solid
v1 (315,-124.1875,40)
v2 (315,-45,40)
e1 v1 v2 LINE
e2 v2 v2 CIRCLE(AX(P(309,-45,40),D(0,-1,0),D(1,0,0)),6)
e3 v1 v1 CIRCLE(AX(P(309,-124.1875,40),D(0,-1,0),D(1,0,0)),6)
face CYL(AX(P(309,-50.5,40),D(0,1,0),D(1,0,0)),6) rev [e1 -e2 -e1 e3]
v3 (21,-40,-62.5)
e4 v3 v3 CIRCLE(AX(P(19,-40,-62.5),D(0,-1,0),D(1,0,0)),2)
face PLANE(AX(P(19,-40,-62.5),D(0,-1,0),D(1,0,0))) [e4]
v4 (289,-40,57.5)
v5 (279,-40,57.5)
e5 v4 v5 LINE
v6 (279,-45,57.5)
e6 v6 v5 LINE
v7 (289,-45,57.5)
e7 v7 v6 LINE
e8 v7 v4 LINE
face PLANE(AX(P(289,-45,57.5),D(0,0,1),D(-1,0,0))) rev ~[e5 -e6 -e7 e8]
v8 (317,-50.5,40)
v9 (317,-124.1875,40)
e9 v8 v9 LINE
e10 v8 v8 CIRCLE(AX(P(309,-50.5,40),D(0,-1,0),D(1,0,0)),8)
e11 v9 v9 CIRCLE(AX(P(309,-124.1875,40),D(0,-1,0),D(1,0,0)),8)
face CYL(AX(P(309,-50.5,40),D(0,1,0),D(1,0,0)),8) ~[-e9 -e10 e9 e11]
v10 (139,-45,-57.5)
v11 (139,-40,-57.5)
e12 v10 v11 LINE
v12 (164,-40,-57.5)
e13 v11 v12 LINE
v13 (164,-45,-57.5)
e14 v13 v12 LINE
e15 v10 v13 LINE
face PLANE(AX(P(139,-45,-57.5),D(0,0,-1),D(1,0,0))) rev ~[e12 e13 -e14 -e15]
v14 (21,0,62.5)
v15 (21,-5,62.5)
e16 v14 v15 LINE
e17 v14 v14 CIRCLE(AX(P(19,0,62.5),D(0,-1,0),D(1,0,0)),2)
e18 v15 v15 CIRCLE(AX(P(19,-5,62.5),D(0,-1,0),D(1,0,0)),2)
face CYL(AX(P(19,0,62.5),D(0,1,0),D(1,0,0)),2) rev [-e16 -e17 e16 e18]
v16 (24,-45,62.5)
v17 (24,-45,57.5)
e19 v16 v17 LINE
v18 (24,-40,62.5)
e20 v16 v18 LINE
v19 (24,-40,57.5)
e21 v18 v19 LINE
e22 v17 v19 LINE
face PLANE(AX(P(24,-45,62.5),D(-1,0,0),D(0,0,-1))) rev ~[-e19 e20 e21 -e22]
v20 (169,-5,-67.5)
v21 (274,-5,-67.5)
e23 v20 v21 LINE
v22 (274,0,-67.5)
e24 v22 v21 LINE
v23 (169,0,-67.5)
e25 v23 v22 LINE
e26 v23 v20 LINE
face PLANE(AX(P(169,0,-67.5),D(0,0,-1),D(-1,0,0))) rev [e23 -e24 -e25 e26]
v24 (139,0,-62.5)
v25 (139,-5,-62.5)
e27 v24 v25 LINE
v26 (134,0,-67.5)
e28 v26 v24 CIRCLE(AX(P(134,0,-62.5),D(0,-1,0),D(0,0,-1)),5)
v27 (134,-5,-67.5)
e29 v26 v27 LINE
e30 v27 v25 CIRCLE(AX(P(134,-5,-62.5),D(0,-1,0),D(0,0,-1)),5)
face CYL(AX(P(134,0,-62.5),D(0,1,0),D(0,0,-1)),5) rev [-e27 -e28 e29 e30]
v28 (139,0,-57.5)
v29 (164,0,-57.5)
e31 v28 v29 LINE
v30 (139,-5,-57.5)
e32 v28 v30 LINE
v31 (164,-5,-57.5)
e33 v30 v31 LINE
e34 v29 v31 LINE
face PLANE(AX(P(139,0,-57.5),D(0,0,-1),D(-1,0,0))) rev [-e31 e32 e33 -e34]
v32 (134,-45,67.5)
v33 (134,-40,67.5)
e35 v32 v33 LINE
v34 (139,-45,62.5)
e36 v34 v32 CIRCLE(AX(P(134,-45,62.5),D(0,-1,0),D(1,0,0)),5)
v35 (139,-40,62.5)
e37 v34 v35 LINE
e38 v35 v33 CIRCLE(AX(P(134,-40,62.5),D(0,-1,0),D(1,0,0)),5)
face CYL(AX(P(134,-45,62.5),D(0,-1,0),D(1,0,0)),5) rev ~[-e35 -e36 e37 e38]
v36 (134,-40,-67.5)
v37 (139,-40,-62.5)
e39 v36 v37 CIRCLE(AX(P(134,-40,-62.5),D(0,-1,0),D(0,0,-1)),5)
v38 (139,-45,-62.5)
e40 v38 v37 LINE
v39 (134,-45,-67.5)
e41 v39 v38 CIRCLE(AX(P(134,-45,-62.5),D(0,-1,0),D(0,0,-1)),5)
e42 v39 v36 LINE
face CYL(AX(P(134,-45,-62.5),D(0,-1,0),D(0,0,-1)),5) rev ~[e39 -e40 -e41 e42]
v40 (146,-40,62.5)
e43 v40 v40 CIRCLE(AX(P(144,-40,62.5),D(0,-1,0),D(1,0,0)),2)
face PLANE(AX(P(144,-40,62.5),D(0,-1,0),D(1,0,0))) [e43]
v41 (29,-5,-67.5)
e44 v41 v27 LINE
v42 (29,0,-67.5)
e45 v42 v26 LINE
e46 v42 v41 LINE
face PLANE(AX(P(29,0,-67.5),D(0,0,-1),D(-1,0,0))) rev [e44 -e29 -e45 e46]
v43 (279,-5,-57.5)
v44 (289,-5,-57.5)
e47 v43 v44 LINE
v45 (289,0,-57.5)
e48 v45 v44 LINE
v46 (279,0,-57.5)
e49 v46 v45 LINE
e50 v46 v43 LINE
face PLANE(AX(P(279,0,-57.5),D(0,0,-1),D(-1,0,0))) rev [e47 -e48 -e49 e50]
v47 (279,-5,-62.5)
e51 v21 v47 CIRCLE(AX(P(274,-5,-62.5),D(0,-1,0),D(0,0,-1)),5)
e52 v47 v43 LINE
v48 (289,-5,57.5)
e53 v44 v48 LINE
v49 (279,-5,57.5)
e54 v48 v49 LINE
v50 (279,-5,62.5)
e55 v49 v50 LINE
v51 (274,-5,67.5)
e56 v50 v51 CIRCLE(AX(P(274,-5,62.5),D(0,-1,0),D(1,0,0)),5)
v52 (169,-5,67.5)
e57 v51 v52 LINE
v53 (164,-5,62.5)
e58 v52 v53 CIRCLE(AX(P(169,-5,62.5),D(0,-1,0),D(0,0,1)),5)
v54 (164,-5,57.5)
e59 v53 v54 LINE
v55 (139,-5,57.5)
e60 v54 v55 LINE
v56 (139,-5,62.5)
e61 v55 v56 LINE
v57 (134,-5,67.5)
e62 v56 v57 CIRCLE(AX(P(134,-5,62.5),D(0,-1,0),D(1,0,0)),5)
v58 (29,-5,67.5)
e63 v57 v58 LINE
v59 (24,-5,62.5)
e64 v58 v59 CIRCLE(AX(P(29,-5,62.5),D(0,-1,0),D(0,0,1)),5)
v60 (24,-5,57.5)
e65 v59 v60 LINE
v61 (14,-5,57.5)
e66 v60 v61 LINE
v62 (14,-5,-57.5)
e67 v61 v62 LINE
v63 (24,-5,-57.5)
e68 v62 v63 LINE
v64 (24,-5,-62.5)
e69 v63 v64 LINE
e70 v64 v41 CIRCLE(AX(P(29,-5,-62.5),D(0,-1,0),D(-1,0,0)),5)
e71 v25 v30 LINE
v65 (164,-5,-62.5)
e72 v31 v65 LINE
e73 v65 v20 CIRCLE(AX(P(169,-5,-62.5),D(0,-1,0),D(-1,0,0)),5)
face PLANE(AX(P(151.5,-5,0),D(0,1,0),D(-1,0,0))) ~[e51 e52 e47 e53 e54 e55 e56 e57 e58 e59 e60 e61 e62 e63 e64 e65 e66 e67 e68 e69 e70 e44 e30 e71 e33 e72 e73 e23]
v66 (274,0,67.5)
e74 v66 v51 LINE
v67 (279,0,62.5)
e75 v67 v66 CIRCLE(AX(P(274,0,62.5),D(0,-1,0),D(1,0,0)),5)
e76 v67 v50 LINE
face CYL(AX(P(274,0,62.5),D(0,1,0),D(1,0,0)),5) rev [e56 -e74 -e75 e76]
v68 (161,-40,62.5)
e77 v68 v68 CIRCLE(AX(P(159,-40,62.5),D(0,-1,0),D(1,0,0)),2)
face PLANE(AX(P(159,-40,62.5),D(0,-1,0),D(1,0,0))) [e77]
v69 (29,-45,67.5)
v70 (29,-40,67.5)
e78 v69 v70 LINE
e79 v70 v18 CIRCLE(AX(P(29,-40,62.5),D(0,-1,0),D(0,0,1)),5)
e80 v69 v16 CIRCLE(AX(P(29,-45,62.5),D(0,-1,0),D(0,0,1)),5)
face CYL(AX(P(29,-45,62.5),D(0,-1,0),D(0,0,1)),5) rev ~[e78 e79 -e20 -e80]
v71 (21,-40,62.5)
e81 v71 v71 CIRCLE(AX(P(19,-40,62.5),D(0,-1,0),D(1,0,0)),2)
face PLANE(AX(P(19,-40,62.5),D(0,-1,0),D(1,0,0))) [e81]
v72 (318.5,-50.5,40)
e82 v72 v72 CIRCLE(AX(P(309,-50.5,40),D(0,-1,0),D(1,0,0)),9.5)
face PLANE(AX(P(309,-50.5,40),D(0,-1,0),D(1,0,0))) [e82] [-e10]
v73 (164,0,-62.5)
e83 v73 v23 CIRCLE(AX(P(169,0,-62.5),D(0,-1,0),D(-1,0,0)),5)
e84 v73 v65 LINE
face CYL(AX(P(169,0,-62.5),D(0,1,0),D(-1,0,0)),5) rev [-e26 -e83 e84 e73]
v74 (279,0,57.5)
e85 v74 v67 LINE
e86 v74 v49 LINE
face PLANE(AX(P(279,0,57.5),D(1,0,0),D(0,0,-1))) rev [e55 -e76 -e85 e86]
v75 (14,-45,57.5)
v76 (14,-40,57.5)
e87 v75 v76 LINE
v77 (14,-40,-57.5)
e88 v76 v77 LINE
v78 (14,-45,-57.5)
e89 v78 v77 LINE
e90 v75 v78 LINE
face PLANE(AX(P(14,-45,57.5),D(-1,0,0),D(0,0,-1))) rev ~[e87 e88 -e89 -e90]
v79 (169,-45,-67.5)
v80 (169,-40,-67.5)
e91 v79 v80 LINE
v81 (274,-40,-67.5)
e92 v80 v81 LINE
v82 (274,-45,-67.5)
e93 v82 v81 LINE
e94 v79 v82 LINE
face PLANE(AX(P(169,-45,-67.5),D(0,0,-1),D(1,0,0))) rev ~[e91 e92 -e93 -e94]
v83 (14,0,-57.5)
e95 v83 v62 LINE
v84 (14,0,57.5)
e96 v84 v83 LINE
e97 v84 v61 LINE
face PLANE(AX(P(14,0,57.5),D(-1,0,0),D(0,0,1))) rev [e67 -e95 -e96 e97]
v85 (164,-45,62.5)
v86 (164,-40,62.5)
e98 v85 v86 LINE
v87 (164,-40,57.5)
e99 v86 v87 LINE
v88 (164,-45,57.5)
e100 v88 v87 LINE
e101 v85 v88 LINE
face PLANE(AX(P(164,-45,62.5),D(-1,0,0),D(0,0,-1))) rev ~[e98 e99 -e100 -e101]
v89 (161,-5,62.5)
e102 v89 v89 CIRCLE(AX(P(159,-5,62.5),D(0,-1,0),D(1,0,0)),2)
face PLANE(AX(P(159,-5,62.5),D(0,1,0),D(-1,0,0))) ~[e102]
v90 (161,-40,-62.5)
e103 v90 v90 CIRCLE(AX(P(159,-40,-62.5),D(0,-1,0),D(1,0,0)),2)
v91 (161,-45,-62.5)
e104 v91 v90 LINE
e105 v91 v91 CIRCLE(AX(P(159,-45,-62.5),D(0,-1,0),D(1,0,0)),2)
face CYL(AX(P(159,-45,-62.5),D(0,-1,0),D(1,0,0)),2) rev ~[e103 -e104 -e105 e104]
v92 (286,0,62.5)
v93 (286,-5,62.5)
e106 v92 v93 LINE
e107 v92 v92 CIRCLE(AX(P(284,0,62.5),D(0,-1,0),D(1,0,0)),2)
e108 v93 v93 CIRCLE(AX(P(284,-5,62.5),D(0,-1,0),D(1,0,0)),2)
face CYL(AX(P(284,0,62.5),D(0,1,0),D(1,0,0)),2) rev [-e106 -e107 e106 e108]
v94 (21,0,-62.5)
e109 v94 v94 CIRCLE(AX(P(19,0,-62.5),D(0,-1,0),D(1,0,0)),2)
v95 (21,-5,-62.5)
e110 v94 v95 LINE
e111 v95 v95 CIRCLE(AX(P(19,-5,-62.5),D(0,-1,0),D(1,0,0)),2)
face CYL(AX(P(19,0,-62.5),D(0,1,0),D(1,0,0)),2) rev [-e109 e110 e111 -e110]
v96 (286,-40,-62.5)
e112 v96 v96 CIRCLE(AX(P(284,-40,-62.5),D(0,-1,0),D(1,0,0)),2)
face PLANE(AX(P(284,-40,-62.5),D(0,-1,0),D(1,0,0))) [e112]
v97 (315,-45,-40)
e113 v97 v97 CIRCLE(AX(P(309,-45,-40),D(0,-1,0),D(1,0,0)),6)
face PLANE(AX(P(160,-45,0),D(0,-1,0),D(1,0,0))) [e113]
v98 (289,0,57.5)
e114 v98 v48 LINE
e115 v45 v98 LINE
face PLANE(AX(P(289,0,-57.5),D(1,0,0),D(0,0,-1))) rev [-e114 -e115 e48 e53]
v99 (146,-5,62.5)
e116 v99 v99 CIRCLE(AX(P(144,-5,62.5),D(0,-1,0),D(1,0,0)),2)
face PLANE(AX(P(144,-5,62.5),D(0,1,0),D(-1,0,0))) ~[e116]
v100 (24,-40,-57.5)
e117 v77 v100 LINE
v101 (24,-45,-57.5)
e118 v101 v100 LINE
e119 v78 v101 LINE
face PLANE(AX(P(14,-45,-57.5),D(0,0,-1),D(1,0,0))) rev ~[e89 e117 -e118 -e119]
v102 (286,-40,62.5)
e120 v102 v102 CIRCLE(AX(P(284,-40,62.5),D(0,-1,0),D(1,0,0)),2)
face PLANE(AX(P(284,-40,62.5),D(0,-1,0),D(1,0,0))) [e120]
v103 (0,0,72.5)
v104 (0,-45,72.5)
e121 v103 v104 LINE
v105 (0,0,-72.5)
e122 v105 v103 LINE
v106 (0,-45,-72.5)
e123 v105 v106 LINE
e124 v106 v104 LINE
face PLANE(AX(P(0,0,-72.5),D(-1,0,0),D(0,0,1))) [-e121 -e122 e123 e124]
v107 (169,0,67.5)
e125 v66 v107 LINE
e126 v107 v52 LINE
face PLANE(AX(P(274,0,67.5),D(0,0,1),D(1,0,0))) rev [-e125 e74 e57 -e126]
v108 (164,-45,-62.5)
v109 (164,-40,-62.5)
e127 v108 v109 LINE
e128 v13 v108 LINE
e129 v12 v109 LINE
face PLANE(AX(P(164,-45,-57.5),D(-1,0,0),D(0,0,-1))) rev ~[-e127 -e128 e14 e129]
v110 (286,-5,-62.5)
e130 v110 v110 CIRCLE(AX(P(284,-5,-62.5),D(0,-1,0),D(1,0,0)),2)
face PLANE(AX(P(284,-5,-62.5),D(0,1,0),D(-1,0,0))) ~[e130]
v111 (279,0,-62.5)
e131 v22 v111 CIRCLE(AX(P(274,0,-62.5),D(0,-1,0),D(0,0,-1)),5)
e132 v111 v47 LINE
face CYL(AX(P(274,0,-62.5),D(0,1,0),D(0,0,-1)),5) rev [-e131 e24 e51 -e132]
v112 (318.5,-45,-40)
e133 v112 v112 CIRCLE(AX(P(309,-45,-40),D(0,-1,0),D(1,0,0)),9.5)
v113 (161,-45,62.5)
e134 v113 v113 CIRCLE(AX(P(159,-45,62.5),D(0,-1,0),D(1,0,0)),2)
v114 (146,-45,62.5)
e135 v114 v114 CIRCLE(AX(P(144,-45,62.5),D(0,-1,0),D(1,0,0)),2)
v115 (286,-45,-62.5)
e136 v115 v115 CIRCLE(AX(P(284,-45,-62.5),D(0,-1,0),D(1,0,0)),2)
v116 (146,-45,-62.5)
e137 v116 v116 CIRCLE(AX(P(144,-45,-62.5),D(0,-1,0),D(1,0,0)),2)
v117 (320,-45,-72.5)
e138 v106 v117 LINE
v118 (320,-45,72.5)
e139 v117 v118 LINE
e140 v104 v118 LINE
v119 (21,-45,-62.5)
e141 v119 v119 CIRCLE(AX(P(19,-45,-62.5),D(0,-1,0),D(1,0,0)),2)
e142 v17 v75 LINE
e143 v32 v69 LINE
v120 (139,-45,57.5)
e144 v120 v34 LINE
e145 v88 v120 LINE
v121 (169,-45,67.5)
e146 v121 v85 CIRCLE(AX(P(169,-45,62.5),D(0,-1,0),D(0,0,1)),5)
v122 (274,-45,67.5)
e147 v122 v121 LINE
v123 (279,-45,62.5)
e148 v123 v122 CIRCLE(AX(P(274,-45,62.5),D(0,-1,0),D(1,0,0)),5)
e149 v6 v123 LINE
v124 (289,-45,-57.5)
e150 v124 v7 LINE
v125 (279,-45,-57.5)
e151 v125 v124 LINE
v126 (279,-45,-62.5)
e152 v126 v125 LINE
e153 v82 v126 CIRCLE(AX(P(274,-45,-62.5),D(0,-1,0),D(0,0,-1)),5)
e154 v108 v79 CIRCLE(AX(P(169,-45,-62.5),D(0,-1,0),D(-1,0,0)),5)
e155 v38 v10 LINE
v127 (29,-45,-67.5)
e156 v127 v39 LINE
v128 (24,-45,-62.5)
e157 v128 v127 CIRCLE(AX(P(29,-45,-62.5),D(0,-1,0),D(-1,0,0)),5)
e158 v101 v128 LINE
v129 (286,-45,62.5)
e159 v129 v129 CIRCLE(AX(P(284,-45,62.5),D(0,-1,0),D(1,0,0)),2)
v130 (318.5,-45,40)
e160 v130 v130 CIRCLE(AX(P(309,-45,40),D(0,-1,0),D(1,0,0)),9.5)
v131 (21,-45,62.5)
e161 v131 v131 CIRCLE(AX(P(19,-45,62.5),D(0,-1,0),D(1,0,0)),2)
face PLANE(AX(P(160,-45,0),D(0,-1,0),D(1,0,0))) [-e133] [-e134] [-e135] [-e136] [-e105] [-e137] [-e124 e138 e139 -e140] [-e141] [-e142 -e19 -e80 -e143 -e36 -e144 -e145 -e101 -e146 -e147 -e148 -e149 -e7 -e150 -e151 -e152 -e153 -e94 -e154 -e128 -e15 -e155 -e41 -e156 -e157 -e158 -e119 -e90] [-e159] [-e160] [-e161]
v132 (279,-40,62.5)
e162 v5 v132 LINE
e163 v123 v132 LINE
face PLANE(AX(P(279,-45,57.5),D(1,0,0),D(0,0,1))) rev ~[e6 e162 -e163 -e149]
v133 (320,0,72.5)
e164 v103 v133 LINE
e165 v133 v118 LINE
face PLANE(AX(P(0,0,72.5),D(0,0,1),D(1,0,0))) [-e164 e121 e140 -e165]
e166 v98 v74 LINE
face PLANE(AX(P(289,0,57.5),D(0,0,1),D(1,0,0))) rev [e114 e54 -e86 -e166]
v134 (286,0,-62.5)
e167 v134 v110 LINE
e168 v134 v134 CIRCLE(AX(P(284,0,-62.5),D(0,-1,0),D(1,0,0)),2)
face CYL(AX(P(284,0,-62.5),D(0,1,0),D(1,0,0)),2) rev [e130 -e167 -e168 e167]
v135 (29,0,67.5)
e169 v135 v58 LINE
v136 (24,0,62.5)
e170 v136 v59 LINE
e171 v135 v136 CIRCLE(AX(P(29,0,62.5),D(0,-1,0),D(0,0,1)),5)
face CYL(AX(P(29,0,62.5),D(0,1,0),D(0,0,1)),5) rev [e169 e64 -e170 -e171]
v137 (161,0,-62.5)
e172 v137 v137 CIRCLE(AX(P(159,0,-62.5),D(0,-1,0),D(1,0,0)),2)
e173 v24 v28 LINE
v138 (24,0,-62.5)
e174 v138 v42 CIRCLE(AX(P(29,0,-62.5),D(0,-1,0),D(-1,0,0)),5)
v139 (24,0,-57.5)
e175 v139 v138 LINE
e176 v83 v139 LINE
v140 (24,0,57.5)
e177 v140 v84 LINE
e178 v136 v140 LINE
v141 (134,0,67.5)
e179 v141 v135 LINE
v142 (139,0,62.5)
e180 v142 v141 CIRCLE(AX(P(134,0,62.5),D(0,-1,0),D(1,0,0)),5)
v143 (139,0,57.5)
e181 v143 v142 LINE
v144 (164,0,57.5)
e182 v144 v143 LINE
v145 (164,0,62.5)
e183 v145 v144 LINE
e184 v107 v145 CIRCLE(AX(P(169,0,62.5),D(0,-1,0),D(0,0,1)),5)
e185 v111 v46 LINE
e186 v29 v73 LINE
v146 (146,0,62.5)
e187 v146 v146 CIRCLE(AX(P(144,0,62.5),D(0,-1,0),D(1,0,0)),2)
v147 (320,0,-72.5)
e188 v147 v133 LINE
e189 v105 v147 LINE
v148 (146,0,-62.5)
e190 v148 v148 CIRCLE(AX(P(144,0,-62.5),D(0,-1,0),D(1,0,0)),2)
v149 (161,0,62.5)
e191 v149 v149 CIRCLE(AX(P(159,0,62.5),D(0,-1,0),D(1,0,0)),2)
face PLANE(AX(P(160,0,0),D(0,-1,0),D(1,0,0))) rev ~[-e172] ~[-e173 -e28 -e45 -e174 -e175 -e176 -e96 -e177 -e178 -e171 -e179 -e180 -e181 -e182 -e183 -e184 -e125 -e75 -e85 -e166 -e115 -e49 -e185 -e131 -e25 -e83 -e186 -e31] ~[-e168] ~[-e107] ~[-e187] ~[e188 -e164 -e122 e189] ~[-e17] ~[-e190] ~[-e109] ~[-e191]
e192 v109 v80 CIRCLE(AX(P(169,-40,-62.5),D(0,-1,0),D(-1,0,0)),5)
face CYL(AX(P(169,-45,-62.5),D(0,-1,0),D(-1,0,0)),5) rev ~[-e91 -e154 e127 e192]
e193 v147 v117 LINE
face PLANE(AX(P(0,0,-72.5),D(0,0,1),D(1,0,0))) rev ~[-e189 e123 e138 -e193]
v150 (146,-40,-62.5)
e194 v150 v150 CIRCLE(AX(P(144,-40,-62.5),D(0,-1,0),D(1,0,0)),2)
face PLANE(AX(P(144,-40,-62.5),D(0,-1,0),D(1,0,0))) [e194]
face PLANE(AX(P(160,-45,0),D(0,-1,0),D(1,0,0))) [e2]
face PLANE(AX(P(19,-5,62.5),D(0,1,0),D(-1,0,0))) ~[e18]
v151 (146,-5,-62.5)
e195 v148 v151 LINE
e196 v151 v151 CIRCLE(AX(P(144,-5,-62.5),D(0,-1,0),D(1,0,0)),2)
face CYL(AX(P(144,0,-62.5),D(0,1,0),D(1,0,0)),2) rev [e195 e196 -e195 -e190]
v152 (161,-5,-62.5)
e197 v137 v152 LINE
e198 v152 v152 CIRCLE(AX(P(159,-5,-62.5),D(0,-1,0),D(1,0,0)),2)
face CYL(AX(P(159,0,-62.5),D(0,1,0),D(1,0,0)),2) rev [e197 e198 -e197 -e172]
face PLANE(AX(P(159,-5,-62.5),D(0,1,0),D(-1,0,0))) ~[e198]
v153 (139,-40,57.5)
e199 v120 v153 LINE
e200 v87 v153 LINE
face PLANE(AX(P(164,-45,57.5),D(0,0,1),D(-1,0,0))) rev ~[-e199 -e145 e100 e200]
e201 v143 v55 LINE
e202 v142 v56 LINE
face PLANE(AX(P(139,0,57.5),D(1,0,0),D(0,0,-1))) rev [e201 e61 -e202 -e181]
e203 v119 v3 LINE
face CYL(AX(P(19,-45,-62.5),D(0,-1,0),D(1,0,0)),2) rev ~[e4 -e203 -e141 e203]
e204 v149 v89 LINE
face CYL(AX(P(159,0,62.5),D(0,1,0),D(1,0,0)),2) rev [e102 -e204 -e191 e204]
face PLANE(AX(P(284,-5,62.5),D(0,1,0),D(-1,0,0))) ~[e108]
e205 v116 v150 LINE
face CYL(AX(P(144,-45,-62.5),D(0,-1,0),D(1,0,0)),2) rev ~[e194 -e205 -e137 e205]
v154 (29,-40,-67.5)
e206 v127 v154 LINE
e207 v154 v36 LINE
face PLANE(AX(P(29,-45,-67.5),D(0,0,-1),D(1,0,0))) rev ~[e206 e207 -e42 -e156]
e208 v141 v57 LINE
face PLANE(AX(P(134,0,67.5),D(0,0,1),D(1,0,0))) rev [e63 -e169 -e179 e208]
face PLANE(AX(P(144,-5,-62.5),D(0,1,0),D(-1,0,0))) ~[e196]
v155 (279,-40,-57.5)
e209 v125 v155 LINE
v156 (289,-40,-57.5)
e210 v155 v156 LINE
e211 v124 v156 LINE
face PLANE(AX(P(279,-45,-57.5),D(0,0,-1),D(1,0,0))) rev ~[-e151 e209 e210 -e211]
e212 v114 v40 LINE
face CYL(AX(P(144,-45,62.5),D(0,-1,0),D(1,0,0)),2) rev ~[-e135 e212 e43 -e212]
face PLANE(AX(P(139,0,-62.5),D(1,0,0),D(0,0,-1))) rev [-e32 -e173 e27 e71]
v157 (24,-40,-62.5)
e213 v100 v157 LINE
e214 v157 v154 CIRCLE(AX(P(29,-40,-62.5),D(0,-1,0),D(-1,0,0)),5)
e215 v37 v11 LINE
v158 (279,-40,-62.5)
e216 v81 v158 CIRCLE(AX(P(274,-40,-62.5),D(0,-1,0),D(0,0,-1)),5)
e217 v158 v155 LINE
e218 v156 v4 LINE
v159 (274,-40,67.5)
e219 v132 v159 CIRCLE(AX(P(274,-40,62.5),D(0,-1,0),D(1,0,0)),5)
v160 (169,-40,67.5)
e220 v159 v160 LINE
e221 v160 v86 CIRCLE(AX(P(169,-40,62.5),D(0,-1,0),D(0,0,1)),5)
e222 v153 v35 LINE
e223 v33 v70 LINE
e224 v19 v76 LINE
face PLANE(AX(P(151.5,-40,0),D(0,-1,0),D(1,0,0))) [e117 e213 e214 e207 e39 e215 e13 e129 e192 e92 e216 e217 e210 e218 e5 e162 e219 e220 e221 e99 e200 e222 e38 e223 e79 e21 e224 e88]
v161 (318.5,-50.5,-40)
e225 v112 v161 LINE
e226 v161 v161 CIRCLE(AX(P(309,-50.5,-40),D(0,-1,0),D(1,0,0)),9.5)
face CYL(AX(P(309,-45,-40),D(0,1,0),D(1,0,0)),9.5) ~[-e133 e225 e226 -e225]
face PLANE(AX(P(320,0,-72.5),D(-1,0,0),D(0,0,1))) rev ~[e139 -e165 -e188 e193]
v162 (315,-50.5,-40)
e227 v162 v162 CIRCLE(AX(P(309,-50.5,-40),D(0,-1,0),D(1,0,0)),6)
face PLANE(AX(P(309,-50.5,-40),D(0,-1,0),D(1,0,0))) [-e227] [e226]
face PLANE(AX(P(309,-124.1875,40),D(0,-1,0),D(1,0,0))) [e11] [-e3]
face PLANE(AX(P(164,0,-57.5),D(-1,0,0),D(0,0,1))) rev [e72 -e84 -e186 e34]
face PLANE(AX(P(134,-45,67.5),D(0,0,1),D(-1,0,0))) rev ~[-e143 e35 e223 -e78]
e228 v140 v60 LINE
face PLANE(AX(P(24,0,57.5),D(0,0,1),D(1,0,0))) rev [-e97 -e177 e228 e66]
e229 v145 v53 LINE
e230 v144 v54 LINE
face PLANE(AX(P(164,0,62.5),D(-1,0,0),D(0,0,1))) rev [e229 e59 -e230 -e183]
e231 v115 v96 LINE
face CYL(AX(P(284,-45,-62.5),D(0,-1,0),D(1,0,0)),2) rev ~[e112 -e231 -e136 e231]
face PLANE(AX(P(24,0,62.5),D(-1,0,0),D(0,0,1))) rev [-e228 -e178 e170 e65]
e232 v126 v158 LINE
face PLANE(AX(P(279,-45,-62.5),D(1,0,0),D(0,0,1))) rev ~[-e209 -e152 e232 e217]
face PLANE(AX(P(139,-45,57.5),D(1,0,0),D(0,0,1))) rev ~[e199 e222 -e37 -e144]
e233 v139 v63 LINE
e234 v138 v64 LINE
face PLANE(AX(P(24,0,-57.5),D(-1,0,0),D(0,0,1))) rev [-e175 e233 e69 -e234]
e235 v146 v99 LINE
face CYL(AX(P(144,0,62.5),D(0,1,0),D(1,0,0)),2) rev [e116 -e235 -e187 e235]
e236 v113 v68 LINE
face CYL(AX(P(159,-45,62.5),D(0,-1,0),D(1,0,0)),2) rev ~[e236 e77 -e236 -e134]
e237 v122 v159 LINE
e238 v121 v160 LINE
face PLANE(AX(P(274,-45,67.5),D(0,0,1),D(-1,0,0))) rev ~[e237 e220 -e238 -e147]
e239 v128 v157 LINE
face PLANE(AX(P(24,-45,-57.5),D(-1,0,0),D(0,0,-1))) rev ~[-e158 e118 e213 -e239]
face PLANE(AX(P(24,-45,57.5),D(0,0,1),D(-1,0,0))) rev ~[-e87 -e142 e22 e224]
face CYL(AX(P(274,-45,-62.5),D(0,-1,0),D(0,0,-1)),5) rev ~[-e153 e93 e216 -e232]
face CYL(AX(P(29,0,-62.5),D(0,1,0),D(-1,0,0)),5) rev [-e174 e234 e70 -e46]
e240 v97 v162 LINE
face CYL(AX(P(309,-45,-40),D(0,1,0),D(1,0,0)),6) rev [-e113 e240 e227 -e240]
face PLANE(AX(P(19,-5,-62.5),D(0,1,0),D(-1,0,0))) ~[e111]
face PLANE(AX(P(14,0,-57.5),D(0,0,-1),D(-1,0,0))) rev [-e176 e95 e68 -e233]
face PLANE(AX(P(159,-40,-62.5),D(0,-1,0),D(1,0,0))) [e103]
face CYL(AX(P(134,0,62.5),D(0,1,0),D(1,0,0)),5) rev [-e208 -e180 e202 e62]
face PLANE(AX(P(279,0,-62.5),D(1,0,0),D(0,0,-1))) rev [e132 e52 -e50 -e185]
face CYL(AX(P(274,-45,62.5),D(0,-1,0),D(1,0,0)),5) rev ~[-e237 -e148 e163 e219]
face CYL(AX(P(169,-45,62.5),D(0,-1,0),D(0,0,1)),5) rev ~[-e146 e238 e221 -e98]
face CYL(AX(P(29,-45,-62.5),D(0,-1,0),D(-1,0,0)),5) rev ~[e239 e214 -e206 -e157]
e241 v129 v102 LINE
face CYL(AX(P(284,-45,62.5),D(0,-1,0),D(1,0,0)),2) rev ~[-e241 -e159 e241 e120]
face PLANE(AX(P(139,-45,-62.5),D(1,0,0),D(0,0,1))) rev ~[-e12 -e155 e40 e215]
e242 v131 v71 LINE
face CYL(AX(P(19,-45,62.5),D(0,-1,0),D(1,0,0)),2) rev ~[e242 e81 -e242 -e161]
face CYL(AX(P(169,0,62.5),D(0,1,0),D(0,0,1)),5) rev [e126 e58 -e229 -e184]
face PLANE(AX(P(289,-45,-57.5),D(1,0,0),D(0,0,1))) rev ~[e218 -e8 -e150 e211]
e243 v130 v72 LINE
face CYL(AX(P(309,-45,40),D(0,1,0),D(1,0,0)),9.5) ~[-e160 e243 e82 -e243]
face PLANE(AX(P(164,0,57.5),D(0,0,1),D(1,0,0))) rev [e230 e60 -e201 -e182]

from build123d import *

# Parameters (mm, degrees)
F0_W     = 320
F0_H     = 145
F1_DEPTH = 45
F2_R     = 9.5
F2_R_2   = 6
F3_DEPTH = 5.5
F4_R     = 2
F5_DEPTH = 5
F7_R     = 8
F7_R_2   = 6
F8_DEPTH = 73.6875


# Not quite as in the source:
# - a pattern or mirror of a feature is missing from the dataset's text; its kind, count and spacing are read off the source's solid


with BuildPart() as f1:
    # F0 (on Front) → F1 (new body)
    with BuildSketch(Plane.XZ):
        with Locations((160, 0)):
            Rectangle(F0_W, F0_H)
    extrude(amount=F1_DEPTH)

    # F2 (on face) → F3 (join)
    with BuildSketch(Plane.XZ.offset(45)):
        with Locations((309, -40)):
            Circle(F2_R)
        with Locations((309, -40)):
            Circle(F2_R_2, mode=Mode.SUBTRACT)
        with Locations((309, 40)):
            Circle(F2_R)
        with Locations((309, 40)):
            Circle(F2_R_2, mode=Mode.SUBTRACT)
    extrude(amount=F3_DEPTH)

    # F4 (on face) → F5 (cut)
    with BuildSketch(Plane.XZ.offset(45)):
        with Locations((19, 62.5)):
            Circle(F4_R)
        with Locations((144, 62.5)):
            Circle(F4_R)
        with Locations((159, 62.5)):
            Circle(F4_R)
        with Locations((284, 62.5)):
            Circle(F4_R)
        with BuildLine():
            Line((24, 57.5), (14, 57.5))
            Line((14, 57.5), (14, 0))
            Line((14, 0), (14, -57.5))
            Line((14, -57.5), (24, -57.5))
            Line((24, -57.5), (24, -62.5))
            ThreePointArc((24, -62.5), (25.4644660941, -66.0355339059), (29, -67.5))
            Line((29, -67.5), (134, -67.5))
            ThreePointArc((134, -67.5), (137.5355339059, -66.0355339059), (139, -62.5))
            Line((139, -62.5), (139, -57.5))
            Line((139, -57.5), (164, -57.5))
            Line((164, -57.5), (164, -62.5))
            ThreePointArc((164, -62.5), (165.4644660941, -66.0355339059), (169, -67.5))
            Line((169, -67.5), (274, -67.5))
            ThreePointArc((274, -67.5), (277.5355339059, -66.0355339059), (279, -62.5))
            Line((279, -62.5), (279, -57.5))
            Line((279, -57.5), (289, -57.5))
            Line((289, -57.5), (289, 0))
            Line((289, 0), (289, 57.5))
            Line((289, 57.5), (279, 57.5))
            Line((279, 57.5), (279, 62.5))
            ThreePointArc((279, 62.5), (277.5355339059, 66.0355339059), (274, 67.5))
            Line((274, 67.5), (169, 67.5))
            ThreePointArc((169, 67.5), (165.4644660941, 66.0355339059), (164, 62.5))
            Line((164, 62.5), (164, 57.5))
            Line((164, 57.5), (139, 57.5))
            Line((139, 57.5), (139, 62.5))
            ThreePointArc((139, 62.5), (137.5355339059, 66.0355339059), (134, 67.5))
            Line((134, 67.5), (29, 67.5))
            ThreePointArc((29, 67.5), (25.4644660941, 66.0355339059), (24, 62.5))
            Line((24, 62.5), (24, 57.5))
        make_face()
        with Locations((284, -62.5)):
            Circle(F4_R)
        with Locations((159, -62.5)):
            Circle(F4_R)
        with Locations((144, -62.5)):
            Circle(F4_R)
        with Locations((19, -62.5)):
            Circle(F4_R)
    f5 = extrude(amount=-F5_DEPTH, mode=Mode.SUBTRACT)

    # F5_copies: F5 across plane
    add(f5.mirror(Plane.ZX.offset(-22.5)), mode=Mode.SUBTRACT)

    # F7 (on face) → F8 (join)
    with BuildSketch(Plane.XZ.offset(50.5)):
        with Locations((309, 40)):
            Circle(F7_R)
        with Locations((309, 40)):
            Circle(F7_R_2, mode=Mode.SUBTRACT)
    extrude(amount=F8_DEPTH)


solid = f1.part
